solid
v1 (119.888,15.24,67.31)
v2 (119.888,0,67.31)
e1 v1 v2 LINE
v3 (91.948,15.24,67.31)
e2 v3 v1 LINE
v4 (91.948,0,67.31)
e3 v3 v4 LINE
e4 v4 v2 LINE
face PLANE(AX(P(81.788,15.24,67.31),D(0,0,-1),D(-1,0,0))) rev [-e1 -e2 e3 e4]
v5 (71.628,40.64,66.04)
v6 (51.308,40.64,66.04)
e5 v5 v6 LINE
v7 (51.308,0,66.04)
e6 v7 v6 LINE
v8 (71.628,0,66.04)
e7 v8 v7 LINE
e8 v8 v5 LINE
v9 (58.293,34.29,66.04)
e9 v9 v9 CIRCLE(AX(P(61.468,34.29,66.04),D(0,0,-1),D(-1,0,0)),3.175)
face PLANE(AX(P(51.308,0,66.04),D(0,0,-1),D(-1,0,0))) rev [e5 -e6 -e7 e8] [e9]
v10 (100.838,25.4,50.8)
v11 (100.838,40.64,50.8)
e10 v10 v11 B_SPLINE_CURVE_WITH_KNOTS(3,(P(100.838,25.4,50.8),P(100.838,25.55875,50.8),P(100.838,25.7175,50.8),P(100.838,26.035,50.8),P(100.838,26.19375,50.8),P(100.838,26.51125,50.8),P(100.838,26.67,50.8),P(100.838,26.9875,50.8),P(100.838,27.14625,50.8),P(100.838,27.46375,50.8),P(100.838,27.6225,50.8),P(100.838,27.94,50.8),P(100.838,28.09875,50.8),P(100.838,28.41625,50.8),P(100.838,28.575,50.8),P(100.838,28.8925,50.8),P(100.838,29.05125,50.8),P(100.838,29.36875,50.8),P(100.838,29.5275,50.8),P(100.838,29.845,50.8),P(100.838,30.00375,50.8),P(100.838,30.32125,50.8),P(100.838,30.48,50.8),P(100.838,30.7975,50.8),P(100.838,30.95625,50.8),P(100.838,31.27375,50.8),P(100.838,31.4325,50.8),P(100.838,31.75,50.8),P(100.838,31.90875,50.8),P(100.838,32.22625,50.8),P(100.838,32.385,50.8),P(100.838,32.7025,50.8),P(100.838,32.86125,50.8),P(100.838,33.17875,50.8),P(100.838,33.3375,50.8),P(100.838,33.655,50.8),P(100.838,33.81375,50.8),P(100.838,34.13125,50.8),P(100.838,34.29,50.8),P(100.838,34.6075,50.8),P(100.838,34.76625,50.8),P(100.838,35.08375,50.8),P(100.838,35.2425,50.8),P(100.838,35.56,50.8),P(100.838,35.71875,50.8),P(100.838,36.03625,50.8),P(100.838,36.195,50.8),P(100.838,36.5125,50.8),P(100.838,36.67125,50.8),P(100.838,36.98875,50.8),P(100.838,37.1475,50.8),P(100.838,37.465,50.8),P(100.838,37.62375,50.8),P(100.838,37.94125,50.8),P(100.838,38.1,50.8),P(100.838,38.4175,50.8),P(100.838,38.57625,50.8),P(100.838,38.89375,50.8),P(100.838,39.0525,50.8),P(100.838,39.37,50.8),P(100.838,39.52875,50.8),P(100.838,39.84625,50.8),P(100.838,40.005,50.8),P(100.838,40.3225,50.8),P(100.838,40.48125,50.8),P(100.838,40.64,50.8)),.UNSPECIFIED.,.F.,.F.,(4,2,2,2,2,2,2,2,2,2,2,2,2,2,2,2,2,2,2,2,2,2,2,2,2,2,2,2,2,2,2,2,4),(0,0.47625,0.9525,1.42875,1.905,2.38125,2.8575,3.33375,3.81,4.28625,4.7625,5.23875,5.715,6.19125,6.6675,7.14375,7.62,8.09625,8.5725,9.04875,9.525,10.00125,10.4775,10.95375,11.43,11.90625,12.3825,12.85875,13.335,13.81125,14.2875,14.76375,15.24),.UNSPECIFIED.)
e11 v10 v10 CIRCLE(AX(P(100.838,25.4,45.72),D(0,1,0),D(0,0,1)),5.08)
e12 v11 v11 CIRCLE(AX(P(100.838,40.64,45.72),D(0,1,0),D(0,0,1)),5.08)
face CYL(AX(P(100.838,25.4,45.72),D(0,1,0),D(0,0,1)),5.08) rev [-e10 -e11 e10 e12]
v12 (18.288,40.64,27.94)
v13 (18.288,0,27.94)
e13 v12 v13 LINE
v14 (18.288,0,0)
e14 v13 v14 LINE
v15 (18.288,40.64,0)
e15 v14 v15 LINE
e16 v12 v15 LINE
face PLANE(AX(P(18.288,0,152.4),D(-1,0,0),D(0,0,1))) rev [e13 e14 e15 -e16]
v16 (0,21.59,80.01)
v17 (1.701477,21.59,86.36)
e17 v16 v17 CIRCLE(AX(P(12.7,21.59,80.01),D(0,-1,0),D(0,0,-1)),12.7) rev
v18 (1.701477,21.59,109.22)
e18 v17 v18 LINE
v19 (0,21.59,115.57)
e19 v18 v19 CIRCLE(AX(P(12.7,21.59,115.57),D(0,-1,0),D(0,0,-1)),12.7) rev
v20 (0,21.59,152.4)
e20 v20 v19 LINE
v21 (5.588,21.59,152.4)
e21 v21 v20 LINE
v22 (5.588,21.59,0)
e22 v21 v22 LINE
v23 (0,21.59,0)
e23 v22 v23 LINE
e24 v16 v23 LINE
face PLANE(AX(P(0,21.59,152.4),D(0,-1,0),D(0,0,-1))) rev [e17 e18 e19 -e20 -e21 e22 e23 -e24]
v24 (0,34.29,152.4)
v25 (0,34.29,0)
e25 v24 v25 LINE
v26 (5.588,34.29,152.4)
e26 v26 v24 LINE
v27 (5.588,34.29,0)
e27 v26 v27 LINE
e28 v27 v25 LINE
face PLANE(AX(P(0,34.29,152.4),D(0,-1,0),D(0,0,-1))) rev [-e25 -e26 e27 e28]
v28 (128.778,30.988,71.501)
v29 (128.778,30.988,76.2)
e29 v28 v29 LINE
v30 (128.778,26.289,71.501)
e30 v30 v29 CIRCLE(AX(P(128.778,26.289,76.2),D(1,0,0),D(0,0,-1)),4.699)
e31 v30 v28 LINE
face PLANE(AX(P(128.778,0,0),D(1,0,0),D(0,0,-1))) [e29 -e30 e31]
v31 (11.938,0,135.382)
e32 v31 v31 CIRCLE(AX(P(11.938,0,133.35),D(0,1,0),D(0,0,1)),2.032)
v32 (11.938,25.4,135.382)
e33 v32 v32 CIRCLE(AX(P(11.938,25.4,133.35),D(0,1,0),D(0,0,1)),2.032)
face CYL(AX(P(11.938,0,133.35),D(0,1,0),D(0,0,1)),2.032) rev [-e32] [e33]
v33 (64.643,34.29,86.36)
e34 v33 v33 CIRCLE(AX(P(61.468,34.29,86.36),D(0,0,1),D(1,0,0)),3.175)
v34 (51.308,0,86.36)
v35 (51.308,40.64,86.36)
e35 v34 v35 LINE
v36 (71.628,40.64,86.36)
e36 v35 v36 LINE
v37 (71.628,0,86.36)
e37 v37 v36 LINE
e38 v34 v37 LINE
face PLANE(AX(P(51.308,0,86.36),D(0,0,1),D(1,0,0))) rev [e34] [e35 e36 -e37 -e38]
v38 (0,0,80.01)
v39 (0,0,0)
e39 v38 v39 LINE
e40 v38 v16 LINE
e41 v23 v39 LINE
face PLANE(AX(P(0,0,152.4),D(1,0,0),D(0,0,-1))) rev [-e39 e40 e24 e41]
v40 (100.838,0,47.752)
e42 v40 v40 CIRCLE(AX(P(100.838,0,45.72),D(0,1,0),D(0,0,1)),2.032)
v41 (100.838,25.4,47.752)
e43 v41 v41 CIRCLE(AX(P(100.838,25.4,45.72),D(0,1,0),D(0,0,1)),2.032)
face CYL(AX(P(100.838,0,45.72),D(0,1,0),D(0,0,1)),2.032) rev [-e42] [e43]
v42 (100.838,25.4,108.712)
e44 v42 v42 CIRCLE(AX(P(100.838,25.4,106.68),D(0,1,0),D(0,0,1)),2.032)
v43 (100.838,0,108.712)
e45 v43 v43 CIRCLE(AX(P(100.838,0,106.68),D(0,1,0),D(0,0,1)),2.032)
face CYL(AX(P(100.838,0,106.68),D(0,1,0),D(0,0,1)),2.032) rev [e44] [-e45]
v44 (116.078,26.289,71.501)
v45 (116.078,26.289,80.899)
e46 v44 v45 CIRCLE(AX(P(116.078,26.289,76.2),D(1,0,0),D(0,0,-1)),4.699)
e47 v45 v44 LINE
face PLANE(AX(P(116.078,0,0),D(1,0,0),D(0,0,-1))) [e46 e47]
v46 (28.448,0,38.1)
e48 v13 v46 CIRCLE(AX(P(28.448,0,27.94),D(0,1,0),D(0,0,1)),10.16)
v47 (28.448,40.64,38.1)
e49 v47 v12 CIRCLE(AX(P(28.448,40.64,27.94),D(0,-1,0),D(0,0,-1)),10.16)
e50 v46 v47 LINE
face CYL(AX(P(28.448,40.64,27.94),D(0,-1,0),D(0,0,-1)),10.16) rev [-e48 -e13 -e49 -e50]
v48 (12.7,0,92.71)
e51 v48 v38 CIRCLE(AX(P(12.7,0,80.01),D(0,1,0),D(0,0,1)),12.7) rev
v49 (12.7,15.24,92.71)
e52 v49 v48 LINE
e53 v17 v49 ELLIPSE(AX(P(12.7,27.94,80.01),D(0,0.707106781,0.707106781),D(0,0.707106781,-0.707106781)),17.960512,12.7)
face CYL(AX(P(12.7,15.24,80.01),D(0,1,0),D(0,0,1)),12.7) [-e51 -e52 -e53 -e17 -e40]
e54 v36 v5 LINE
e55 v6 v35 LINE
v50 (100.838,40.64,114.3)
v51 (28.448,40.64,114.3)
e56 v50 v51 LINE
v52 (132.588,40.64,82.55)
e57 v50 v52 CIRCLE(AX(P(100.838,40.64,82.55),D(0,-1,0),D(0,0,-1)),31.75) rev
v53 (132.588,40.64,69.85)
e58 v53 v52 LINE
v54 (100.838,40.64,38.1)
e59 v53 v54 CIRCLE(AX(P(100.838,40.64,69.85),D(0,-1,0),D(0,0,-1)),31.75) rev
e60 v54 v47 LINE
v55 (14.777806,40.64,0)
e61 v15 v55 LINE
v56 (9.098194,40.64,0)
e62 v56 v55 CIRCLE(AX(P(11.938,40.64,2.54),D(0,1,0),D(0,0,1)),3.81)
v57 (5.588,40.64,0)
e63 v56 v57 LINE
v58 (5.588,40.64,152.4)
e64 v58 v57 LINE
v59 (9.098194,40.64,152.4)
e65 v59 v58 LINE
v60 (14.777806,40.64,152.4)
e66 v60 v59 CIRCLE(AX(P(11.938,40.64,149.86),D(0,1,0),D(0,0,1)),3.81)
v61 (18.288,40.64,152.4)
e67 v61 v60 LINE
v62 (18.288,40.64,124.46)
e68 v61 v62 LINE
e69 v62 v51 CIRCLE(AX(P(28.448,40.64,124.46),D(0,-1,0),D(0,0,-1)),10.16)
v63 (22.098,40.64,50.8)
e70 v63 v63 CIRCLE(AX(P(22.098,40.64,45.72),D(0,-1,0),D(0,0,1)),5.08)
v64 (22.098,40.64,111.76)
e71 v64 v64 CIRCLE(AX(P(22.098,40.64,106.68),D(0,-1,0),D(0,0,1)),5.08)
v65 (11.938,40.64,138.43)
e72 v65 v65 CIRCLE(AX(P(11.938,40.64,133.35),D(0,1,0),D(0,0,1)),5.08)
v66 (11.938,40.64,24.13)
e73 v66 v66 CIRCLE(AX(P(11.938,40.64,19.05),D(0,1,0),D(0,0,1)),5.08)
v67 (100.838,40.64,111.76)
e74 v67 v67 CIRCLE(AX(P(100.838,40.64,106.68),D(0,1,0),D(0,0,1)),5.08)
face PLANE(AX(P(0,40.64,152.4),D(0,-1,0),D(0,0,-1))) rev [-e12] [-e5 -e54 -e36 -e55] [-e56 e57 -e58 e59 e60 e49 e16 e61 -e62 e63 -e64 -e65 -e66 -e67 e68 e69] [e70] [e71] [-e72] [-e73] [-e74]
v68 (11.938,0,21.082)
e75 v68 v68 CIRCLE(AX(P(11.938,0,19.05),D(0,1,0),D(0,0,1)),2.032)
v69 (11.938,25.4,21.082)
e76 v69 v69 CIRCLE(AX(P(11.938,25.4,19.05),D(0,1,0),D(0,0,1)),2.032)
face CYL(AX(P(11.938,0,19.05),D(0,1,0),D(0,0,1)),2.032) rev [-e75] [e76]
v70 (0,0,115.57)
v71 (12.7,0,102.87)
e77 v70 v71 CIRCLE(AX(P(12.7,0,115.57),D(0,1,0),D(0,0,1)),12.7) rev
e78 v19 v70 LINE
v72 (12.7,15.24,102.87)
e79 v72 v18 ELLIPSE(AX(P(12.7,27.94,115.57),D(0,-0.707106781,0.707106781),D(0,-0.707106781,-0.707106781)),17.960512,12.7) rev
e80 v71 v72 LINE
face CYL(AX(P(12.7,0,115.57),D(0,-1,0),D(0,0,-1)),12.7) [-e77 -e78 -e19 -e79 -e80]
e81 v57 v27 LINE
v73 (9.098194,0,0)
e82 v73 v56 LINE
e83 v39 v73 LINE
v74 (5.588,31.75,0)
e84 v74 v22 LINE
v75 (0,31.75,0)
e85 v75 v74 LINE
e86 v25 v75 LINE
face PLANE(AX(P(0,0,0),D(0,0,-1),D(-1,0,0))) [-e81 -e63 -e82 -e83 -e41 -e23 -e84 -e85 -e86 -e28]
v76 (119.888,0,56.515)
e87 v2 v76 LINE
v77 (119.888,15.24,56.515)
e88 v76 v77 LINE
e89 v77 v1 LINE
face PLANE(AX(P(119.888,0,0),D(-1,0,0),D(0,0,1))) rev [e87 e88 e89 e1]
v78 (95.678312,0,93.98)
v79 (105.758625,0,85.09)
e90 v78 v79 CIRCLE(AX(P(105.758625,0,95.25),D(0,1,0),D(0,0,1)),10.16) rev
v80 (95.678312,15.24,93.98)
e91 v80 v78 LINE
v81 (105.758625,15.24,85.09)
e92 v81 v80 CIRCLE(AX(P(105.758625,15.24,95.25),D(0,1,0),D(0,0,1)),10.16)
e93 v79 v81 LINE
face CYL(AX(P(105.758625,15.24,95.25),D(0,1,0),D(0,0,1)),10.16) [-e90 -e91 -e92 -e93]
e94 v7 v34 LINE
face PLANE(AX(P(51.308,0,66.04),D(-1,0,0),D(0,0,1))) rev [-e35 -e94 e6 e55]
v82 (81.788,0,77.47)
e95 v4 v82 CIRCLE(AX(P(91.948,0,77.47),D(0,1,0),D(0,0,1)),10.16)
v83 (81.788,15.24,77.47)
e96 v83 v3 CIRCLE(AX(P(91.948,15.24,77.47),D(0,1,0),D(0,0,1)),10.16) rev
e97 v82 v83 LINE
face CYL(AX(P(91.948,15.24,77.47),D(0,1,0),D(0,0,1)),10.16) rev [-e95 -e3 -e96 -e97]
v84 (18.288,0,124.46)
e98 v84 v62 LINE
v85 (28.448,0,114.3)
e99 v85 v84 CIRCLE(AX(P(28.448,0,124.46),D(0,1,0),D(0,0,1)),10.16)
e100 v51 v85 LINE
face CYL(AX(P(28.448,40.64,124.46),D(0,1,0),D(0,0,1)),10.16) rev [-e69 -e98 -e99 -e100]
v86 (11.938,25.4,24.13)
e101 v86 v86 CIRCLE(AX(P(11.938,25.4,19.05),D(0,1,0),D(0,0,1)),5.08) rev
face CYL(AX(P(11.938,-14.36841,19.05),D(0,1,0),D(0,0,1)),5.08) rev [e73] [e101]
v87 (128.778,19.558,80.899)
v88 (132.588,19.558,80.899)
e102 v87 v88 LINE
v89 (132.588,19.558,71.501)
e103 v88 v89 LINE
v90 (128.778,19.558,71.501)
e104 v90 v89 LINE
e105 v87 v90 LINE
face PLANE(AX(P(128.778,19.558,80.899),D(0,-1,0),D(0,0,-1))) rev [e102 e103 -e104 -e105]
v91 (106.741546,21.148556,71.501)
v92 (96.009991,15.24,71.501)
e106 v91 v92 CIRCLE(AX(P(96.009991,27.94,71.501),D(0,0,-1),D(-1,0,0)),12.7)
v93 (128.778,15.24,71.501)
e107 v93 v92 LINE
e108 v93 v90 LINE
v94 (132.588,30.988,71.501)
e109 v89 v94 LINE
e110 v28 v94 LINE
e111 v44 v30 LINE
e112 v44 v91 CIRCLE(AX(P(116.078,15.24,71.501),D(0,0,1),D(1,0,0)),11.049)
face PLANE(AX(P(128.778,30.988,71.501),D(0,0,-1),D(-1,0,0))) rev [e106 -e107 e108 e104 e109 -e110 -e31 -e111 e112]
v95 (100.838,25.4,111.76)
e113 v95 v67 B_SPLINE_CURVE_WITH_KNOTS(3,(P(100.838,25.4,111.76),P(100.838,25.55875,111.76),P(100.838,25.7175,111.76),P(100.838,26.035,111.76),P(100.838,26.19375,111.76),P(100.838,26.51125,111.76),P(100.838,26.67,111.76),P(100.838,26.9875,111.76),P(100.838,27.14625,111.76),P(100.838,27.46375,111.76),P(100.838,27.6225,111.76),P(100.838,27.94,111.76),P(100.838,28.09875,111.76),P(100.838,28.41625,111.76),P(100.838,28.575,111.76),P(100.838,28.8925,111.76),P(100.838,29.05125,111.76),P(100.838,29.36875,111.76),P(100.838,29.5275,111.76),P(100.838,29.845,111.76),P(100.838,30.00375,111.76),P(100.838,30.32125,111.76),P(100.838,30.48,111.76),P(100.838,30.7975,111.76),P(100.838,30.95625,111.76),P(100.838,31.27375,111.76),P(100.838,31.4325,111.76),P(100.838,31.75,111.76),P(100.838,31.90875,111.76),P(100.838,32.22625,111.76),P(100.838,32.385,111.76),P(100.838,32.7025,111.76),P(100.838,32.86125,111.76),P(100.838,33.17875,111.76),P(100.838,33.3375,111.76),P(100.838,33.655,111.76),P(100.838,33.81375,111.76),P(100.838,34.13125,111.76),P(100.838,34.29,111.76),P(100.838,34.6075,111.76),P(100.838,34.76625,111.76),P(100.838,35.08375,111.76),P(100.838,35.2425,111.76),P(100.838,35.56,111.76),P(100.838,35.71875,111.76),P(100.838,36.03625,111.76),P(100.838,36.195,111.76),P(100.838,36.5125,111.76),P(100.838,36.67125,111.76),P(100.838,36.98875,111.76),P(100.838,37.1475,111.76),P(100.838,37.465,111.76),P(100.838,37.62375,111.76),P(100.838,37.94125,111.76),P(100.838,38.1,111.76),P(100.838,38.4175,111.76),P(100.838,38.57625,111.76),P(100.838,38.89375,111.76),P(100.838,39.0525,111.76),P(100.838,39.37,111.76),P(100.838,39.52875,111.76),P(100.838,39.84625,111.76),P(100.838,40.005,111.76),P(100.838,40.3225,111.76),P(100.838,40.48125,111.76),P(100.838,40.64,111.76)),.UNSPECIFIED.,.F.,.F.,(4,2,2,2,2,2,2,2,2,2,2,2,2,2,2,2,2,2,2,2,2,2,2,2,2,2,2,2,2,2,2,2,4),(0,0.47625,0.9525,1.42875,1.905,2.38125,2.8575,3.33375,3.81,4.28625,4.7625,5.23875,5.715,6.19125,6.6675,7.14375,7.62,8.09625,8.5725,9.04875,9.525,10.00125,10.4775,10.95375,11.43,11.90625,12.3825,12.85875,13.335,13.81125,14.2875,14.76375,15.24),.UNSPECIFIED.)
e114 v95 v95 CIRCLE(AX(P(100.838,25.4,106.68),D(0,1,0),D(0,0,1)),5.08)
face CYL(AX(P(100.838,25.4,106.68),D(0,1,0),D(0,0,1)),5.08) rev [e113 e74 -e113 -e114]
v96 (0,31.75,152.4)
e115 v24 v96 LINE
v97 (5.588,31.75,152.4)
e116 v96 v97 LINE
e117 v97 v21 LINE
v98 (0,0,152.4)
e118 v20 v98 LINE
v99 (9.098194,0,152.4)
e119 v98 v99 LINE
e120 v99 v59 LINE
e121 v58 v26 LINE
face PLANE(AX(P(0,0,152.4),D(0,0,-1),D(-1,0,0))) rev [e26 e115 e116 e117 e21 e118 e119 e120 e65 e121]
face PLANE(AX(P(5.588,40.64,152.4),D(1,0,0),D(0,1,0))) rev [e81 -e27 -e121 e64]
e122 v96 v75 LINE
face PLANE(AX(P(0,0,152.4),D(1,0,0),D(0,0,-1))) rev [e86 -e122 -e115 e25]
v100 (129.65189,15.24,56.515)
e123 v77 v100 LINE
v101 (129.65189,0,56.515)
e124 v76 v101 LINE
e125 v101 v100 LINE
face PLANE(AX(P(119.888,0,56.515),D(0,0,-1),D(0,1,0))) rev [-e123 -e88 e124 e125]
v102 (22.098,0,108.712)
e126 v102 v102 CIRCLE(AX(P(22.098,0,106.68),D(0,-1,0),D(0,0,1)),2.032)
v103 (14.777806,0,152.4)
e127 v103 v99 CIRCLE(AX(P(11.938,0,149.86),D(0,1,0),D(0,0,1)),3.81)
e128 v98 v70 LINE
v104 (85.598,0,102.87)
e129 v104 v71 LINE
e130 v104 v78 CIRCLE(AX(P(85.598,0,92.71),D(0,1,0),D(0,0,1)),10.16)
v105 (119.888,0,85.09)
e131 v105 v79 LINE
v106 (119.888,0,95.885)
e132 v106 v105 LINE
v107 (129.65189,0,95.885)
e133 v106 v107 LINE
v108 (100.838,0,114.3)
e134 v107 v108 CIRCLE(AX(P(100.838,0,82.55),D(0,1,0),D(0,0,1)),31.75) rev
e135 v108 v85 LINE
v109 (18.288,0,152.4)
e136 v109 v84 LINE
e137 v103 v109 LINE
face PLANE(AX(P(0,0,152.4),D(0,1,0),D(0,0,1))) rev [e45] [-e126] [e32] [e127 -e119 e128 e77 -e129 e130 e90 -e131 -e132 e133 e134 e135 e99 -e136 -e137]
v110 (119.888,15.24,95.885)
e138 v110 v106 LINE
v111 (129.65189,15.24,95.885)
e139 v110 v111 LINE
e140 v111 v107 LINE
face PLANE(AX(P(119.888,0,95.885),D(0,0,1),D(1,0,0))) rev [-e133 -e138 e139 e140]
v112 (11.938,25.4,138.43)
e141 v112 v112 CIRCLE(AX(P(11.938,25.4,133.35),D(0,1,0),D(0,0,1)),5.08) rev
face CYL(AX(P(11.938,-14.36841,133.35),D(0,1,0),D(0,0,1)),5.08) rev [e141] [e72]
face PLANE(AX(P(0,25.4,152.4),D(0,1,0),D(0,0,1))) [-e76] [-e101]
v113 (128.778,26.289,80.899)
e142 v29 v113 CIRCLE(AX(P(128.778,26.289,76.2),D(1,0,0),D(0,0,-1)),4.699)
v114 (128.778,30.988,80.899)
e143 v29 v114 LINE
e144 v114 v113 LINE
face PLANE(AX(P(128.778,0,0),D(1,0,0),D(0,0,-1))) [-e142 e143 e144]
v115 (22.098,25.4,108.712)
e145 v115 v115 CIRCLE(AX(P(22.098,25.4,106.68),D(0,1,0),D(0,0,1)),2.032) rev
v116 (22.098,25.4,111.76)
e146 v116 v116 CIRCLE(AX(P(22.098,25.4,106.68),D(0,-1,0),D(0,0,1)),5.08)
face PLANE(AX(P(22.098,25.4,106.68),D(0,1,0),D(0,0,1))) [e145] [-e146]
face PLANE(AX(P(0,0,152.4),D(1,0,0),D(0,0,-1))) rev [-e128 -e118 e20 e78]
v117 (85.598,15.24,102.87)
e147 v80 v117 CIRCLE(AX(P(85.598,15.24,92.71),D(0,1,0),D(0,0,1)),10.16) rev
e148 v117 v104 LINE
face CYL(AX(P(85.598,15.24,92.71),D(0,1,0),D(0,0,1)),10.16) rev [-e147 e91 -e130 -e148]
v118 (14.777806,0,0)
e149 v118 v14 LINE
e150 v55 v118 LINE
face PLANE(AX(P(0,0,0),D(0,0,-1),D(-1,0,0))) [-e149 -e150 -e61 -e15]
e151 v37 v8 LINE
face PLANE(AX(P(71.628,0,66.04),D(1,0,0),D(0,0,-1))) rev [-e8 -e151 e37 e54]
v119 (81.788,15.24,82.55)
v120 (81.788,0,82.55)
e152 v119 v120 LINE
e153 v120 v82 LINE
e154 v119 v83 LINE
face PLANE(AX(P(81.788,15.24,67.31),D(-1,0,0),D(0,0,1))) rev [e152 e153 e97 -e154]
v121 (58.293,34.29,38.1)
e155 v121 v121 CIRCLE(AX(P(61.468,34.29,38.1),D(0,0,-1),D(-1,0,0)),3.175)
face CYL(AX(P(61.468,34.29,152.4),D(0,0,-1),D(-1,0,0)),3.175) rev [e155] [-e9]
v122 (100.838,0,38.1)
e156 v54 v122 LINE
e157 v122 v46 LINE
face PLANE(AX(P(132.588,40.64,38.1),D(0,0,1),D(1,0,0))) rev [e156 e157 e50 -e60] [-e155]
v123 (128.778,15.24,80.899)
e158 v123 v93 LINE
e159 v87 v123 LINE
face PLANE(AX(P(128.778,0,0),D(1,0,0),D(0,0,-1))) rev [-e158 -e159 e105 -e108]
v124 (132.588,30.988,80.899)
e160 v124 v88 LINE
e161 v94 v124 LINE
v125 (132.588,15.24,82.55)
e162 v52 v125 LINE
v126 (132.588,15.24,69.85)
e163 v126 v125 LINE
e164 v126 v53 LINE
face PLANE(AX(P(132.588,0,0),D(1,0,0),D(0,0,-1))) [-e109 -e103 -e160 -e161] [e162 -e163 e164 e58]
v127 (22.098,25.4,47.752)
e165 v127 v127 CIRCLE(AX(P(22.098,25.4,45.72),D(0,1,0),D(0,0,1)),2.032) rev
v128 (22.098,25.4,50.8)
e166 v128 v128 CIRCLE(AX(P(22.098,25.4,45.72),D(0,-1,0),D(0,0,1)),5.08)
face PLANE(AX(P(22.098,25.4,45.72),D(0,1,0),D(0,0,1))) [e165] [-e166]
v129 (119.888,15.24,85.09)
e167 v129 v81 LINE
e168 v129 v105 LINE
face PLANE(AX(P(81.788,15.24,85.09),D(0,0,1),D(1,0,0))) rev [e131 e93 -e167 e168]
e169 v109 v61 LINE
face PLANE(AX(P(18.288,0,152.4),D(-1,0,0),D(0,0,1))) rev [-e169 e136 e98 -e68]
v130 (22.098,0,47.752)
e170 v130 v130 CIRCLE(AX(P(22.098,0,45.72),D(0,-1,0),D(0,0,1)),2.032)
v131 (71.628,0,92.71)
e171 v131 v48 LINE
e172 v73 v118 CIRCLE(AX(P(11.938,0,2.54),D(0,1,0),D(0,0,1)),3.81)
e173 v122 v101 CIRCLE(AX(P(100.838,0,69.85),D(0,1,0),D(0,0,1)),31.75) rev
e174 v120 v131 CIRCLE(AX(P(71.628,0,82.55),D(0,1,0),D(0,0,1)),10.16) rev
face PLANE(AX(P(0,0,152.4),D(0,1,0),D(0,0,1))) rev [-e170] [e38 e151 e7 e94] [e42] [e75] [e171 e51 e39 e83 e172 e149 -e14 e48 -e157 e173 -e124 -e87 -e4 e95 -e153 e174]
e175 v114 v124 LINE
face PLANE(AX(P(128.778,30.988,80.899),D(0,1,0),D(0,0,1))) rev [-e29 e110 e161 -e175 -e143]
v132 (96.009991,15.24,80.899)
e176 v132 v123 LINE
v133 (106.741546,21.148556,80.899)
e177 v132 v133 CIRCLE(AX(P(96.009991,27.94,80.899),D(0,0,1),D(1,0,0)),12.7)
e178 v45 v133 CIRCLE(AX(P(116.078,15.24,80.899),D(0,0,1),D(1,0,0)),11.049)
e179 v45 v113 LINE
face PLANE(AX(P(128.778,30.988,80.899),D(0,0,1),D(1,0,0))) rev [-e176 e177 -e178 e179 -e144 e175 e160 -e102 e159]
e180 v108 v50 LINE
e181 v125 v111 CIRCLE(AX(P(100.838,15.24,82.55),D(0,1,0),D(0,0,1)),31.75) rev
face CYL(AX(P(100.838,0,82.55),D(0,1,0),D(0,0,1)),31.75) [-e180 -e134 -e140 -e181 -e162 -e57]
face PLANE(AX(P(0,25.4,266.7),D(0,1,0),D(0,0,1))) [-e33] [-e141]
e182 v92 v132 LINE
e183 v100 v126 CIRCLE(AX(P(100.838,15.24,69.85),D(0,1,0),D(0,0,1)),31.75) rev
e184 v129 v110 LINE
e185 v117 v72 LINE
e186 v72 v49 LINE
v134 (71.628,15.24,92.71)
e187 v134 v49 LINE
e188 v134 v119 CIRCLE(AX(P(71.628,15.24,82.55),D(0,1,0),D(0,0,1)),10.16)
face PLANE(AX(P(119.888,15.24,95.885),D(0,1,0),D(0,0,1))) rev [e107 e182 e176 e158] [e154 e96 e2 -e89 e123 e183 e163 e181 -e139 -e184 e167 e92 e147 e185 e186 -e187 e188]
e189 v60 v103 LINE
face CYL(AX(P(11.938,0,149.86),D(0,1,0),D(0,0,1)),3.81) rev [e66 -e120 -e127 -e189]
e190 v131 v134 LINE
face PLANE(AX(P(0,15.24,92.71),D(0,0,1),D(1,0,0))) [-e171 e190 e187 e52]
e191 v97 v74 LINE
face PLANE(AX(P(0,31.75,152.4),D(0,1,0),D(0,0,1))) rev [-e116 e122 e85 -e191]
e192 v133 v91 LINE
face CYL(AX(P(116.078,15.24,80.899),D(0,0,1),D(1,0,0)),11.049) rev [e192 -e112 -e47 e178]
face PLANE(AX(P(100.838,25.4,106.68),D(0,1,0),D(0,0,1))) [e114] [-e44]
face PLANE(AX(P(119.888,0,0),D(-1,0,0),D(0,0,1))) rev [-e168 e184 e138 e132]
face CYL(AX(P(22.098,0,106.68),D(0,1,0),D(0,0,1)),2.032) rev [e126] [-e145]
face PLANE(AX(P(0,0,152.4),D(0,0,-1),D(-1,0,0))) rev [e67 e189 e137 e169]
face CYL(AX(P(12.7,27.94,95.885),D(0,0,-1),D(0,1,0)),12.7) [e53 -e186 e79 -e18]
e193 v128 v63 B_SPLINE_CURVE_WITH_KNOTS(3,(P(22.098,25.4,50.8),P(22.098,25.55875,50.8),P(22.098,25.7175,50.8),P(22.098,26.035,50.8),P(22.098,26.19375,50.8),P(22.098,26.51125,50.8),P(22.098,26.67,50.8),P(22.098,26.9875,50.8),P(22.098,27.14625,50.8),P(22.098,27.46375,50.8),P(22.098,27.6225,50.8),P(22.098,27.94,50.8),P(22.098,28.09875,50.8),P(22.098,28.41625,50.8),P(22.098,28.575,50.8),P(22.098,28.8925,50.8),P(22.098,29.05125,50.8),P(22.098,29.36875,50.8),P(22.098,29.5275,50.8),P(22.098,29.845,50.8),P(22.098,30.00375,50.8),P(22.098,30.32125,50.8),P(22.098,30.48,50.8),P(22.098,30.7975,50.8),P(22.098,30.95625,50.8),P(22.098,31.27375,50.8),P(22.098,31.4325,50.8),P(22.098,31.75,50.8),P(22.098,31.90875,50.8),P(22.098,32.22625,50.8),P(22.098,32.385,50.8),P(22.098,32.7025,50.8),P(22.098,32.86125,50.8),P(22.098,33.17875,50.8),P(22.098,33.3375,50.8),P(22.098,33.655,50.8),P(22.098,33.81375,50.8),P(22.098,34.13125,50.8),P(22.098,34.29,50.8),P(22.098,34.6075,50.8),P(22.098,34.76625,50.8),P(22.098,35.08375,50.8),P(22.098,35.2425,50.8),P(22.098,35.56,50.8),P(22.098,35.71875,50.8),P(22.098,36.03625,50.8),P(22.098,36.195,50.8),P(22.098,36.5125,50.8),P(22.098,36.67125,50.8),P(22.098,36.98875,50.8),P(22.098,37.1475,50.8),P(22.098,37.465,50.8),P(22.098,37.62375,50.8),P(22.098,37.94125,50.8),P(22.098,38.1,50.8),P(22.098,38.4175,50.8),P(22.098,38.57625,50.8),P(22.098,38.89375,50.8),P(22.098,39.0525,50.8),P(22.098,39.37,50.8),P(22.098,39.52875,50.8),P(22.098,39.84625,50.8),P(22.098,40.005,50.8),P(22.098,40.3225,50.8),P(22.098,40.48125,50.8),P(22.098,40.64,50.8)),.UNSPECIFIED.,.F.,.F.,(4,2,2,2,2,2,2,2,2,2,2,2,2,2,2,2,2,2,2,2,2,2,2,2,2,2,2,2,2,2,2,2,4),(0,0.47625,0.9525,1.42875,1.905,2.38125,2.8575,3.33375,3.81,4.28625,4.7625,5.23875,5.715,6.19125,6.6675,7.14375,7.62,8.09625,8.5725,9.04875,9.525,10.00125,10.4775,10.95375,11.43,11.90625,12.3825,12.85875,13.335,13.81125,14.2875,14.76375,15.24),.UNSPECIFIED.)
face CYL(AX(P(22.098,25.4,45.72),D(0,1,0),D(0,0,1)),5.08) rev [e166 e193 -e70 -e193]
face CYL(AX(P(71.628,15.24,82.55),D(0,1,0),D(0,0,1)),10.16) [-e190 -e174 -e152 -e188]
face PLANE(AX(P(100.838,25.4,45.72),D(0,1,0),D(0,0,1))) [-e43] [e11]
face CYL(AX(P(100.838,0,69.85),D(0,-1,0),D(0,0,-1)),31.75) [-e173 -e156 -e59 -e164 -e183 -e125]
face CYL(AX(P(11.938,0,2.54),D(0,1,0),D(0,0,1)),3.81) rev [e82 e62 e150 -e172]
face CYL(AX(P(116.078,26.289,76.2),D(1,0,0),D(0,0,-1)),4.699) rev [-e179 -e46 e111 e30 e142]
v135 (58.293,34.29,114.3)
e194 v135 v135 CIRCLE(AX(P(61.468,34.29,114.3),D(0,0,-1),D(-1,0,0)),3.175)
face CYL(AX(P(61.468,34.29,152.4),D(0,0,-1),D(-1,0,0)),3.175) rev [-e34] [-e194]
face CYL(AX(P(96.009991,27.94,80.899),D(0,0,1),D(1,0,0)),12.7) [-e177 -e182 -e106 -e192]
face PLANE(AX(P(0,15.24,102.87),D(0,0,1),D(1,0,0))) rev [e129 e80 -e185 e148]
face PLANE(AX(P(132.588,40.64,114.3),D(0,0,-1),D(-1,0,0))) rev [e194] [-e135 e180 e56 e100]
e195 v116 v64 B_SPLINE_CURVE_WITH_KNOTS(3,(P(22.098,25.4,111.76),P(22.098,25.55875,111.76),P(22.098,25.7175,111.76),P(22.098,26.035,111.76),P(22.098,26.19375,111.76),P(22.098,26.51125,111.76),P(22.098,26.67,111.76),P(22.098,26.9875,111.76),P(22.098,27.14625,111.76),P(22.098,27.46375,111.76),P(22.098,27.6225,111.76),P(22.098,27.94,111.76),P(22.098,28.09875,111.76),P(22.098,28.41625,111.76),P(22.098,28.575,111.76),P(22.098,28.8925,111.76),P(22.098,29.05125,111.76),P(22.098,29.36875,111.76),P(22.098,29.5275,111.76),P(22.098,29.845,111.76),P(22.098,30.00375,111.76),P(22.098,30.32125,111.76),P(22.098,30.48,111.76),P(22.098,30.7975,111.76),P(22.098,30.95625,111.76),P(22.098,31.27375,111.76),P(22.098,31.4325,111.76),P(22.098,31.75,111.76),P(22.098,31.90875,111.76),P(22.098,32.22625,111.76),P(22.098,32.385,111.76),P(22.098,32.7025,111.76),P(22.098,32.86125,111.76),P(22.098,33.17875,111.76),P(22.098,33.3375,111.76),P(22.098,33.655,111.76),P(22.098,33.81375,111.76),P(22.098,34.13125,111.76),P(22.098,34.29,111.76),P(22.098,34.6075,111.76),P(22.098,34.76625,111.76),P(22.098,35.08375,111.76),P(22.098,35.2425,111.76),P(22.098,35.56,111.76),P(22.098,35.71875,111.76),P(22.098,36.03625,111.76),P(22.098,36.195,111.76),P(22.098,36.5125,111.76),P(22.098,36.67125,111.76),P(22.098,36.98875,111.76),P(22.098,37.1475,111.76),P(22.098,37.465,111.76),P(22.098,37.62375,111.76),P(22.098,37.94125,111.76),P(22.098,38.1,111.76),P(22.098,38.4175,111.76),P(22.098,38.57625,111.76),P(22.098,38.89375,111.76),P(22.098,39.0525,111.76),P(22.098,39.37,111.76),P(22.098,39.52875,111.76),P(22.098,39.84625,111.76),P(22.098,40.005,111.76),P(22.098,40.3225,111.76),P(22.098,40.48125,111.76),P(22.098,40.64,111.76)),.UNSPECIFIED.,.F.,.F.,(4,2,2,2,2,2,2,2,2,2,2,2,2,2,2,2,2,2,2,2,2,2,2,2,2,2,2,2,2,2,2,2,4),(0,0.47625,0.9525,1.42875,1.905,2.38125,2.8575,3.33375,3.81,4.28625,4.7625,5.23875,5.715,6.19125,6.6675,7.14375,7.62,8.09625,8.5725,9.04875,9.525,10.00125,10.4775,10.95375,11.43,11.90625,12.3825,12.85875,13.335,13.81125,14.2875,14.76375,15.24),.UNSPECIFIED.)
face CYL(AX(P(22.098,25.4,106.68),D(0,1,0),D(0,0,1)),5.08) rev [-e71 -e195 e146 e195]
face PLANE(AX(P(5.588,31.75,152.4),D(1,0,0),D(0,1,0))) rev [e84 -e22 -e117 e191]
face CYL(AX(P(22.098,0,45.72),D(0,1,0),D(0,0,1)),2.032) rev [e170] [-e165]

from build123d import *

# Parameters (mm, degrees)
SKETCH1_W           = 18.288
SKETCH1_H           = 40.64
BOSS_EXTRUDE1_DEPTH = 152.4
SKETCH2_W           = 5.588
SKETCH2_H           = 6.35
SKETCH2_H_2         = 10.16
CUT_EXTRUDE1_DEPTH  = 152.4
SKETCH3_R           = 5.08
CUT_EXTRUDE2_DEPTH  = 15.24
LPATTERN1_COUNT     = 4
LPATTERN1_PITCH     = 38.1
SKETCH4_R           = 2.032
CUT_EXTRUDE3_DEPTH  = 159.782305513
LPATTERN2_COUNT     = 4
LPATTERN2_PITCH     = 38.1
SKETCH5_W           = 76.2
SKETCH5_H           = 40.64
BOSS_EXTRUDE2_DEPTH = 114.3
SKETCH6_W           = 101.6
SKETCH6_H           = 76.2
BOSS_EXTRUDE3_DEPTH = 22.86
SKETCH8_R           = 3.81
CUT_EXTRUDE5_DEPTH  = 207.050836795
FILLET3_R           = 10.16
FILLET4_R           = 31.75
SKETCH16_W          = 76.2
SKETCH16_H          = 22.86
CUT_EXTRUDE13_DEPTH = 194.857086535
SKETCH18_W          = 20.32
SKETCH18_H          = 20.32
CUT_EXTRUDE14_DEPTH = 207.050836795
SKETCH19_W          = 39.37
SKETCH19_H          = 15.24
CUT_EXTRUDE15_DEPTH = 12.7
SKETCH20_W          = 38.1
SKETCH20_H          = 17.78
CUT_EXTRUDE16_DEPTH = 15.24
SKETCH21_W          = 13.97
SKETCH21_H          = 7.62
CUT_EXTRUDE17_DEPTH = 15.24
FILLET5_R           = 10.16
SKETCH22_W          = 9.398
SKETCH22_H          = 11.43
CUT_EXTRUDE18_DEPTH = 3.81
CUT_EXTRUDE19_DEPTH = 12.7
SKETCH25_W          = 9.398
SKETCH25_H          = 11.049
FILLET6_R           = 12.7
FILLET7_R           = 12.7
SKETCH26_R          = 5.08
CUT_EXTRUDE20_DEPTH = 15.24
SKETCH27_R          = 2.032
CUT_EXTRUDE21_DEPTH = 207.050836795
FILLET8_R           = 10.16
SKETCH29_R          = 3.175
CUT_EXTRUDE22_DEPTH = 180.70998134


with BuildPart() as part:
    # Sketch1 → Boss-Extrude1 (new body)
    with BuildSketch(Plane.XY):
        with Locations((9.144, 20.32)):
            Rectangle(SKETCH1_W, SKETCH1_H)
    extrude(amount=BOSS_EXTRUDE1_DEPTH)

    # Sketch2 → Cut-Extrude1 (cut)
    with BuildSketch(Plane(origin=(0, 0, 0), x_dir=(-1, 0, 0), z_dir=(0, 0, -1))):
        with Locations((-2.794, 37.465)):
            Rectangle(SKETCH2_W, SKETCH2_H)
        with Locations((-2.794, 26.67)):
            Rectangle(SKETCH2_W, SKETCH2_H_2)
    extrude(amount=-CUT_EXTRUDE1_DEPTH, mode=Mode.SUBTRACT)

    # Sketch3 → Cut-Extrude2 (cut)
    with BuildSketch(Plane(origin=(0, 40.64, 0), x_dir=(1, 0, 0), z_dir=(0, 1, 0))):
        with Locations(Location((11.938, -19.05, 0), (0, 0, 270))):
            Circle(SKETCH3_R)
    cut_extrude2 = extrude(amount=-CUT_EXTRUDE2_DEPTH, mode=Mode.SUBTRACT)

    # LPattern1: Cut-Extrude2 ×4, 2 skipped
    with Locations(*[(0, 0, i * LPATTERN1_PITCH) for i in range(1, LPATTERN1_COUNT) if i not in (1, 2)]):
        add(cut_extrude2, mode=Mode.SUBTRACT)

    # Sketch4 → Cut-Extrude3 (cut, through all)
    with BuildSketch(Plane(origin=(0, 40.64, 0), x_dir=(1, 0, 0), z_dir=(0, 1, 0))):
        with Locations(Location((11.938, -19.05, 0), (0, 0, 270))):
            Circle(SKETCH4_R)
    cut_extrude3 = extrude(amount=-CUT_EXTRUDE3_DEPTH, mode=Mode.SUBTRACT)

    # LPattern2: Cut-Extrude3 ×4, 2 skipped
    with Locations(*[(0, 0, i * LPATTERN2_PITCH) for i in range(1, LPATTERN2_COUNT) if i not in (1, 2)]):
        add(cut_extrude3, mode=Mode.SUBTRACT)

    # Sketch5 → Boss-Extrude2 (add)
    with BuildSketch(Plane(origin=(18.288, 0, 0), x_dir=(0, 0, -1), z_dir=(1, 0, 0))):
        with Locations((-76.2, 20.32)):
            Rectangle(SKETCH5_W, SKETCH5_H)
    extrude(amount=BOSS_EXTRUDE2_DEPTH)

    # Sketch6 → Boss-Extrude3 (add)
    with BuildSketch(Plane(origin=(0, 40.64, 0), x_dir=(1, 0, 0), z_dir=(0, 1, 0))):
        with Locations((81.788, -76.2)):
            Rectangle(SKETCH6_W, SKETCH6_H)
    extrude(amount=BOSS_EXTRUDE3_DEPTH)

    # Sketch8 → Cut-Extrude5 (cut, through all)
    with BuildSketch(Plane(origin=(0, 40.64, 0), x_dir=(1, 0, 0), z_dir=(0, 1, 0))):
        with Locations((11.938, -149.86)):
            Circle(SKETCH8_R)
        with Locations((11.938, -2.54)):
            Circle(SKETCH8_R)
    extrude(amount=-CUT_EXTRUDE5_DEPTH, mode=Mode.SUBTRACT)

    # Fillet3
    fillet3_edges = [part.edges().sort_by_distance(p)[0] for p in [
        (18.288, 20.32, 114.3),
        (18.288, 20.32, 38.1),
    ]]
    fillet(fillet3_edges, radius=FILLET3_R)

    # Fillet4
    fillet4_edges = [part.edges().sort_by_distance(p)[0] for p in [
        (132.588, 31.75, 114.3),
        (132.588, 31.75, 38.1),
    ]]
    fillet(fillet4_edges, radius=FILLET4_R)

    # Sketch16 → Cut-Extrude13 (cut, through all)
    with BuildSketch(Plane.ZY.offset(-30.988)):
        with Locations((76.2, 52.07)):
            Rectangle(SKETCH16_W, SKETCH16_H)
    extrude(amount=-CUT_EXTRUDE13_DEPTH, mode=Mode.SUBTRACT)

    # Sketch18 → Cut-Extrude14 (cut, through all)
    with BuildSketch(Plane(origin=(0, 40.64, 0), x_dir=(1, 0, 0), z_dir=(0, 1, 0))):
        with Locations((61.468, -76.2)):
            Rectangle(SKETCH18_W, SKETCH18_H)
    extrude(amount=-CUT_EXTRUDE14_DEPTH, mode=Mode.SUBTRACT)

    # Sketch19 → Cut-Extrude15 (cut)
    with BuildSketch(Plane(origin=(132.588, 0, 0), x_dir=(0, 0, -1), z_dir=(1, 0, 0))):
        with Locations((-76.2, 7.62)):
            Rectangle(SKETCH19_W, SKETCH19_H)
    extrude(amount=-CUT_EXTRUDE15_DEPTH, mode=Mode.SUBTRACT)

    # Sketch20 → Cut-Extrude16 (cut)
    with BuildSketch(Plane.XZ):
        with Locations((100.838, 76.2)):
            Rectangle(SKETCH20_W, SKETCH20_H)
    extrude(amount=-CUT_EXTRUDE16_DEPTH, mode=Mode.SUBTRACT)

    # Sketch21 → Cut-Extrude17 (cut)
    with BuildSketch(Plane.XZ):
        Polygon((0, 92.71), (81.788, 92.71), (95.758, 92.71), (95.758, 102.87), (0, 102.87), align=None)
        with Locations((88.773, 88.9)):
            Rectangle(SKETCH21_W, SKETCH21_H)
    extrude(amount=-CUT_EXTRUDE17_DEPTH, mode=Mode.SUBTRACT)

    # Fillet5
    fillet5_edges = [part.edges().sort_by_distance(p)[0] for p in [
        (81.788, 7.62, 67.31),
        (95.758, 7.62, 102.87),
        (81.788, 7.62, 92.71),
    ]]
    fillet(fillet5_edges, radius=FILLET5_R)

    # Sketch22 → Cut-Extrude18 (cut)
    with BuildSketch(Plane(origin=(132.588, 0, 0), x_dir=(0, 0, -1), z_dir=(1, 0, 0))):
        with Locations((-76.2, 25.273)):
            Rectangle(SKETCH22_W, SKETCH22_H)
    extrude(amount=-CUT_EXTRUDE18_DEPTH, mode=Mode.SUBTRACT)

    # Sketch23 → Cut-Extrude19 (cut)
    with BuildSketch(Plane(origin=(128.778, 0, 0), x_dir=(0, 0, -1), z_dir=(1, 0, 0))):
        with BuildLine():
            Line((-71.501, 19.558), (-71.501, 26.289))
            ThreePointArc((-71.501, 26.289), (-72.877305235, 22.966305235), (-76.2, 21.59))
            Line((-76.2, 21.59), (-76.2, 19.558))
            Line((-76.2, 19.558), (-71.501, 19.558))
        make_face()
        with BuildLine():
            ThreePointArc((-71.501, 26.289), (-72.877305235, 29.611694765), (-76.2, 30.988))
            Line((-76.2, 30.988), (-76.2, 26.289))
            Line((-76.2, 26.289), (-71.501, 26.289))
        make_face()
        with BuildLine():
            Line((-76.2, 26.289), (-76.2, 30.988))
            ThreePointArc((-76.2, 30.988), (-79.522694765, 29.611694765), (-80.899, 26.289))
            Line((-80.899, 26.289), (-76.2, 26.289))
        make_face()
        with BuildLine():
            Line((-71.501, 26.289), (-76.2, 26.289))
            Line((-76.2, 26.289), (-76.2, 21.59))
            ThreePointArc((-76.2, 21.59), (-72.877305235, 22.966305235), (-71.501, 26.289))
        make_face()
        with BuildLine():
            Line((-76.2, 21.59), (-76.2, 26.289))
            Line((-76.2, 26.289), (-80.899, 26.289))
            ThreePointArc((-80.899, 26.289), (-79.522694765, 22.966305235), (-76.2, 21.59))
        make_face()
        with BuildLine():
            ThreePointArc((-76.2, 21.59), (-79.522694765, 22.966305235), (-80.899, 26.289))
            Line((-80.899, 26.289), (-80.899, 19.558))
            Line((-80.899, 19.558), (-76.2, 19.558))
            Line((-76.2, 19.558), (-76.2, 21.59))
        make_face()
        Polygon((-71.501, 9.779), (-71.501, 19.558), (-76.2, 19.558), (-80.899, 19.558), (-80.899, 9.779), align=None)
    extrude(amount=-CUT_EXTRUDE19_DEPTH, mode=Mode.SUBTRACT)

    # Sketch25 → Cut-Revolve1 (revolve, cut)
    with BuildSketch(Plane(origin=(116.078, 0, 0), x_dir=(0, 0, -1), z_dir=(1, 0, 0))):
        with Locations((-76.2, 20.7645)):
            Rectangle(SKETCH25_W, SKETCH25_H)
    revolve(axis=Axis((116.078, 15.24, 80.899), (0, 0, -1)), mode=Mode.SUBTRACT)

    # Fillet6
    fillet6_edges = [part.edges().sort_by_distance(p)[0] for p in [
        (105.029, 15.24, 76.2),
    ]]
    fillet(fillet6_edges, radius=FILLET6_R)

    # Fillet7
    # the kernel refuses this fillet: 12.7 mm, written as the material it takes off along each edge
    with BuildSketch(Plane(origin=(0, 15.24, 102.87), x_dir=(1, 0, 0), z_dir=(0, 0, -1))) as fillet7_piece_1:
        with BuildLine():
            CenterArc((FILLET7_R, -FILLET7_R), FILLET7_R, 90, 90)
            Line((0, -FILLET7_R), (0, 0))
            Line((0, 0), (FILLET7_R, 0))
        make_face()
    extrude(amount=10.16, mode=Mode.SUBTRACT)
    with BuildSketch(Plane(origin=(0, -31.75, 92.71), x_dir=(0, 0, -1), z_dir=(0, 1, 0))) as fillet7_piece_2:
        with BuildLine():
            CenterArc((FILLET7_R, -FILLET7_R), FILLET7_R, 90, 90)
            Line((0, -FILLET7_R), (0, 0))
            Line((0, 0), (FILLET7_R, 0))
        make_face()
    extrude(amount=46.99, mode=Mode.SUBTRACT)
    with BuildSketch(Plane(origin=(0, -31.75, 102.87), x_dir=(0, 0, 1), z_dir=(0, 1, 0))) as fillet7_piece_3:
        with BuildLine():
            CenterArc((FILLET7_R, FILLET7_R), FILLET7_R, 180, 90)
            Line((0, FILLET7_R), (0, 0))
            Line((0, 0), (FILLET7_R, 0))
        make_face()
    extrude(amount=46.99, mode=Mode.SUBTRACT)
    with BuildSketch(Plane(origin=(0, 15.24, 134.62), x_dir=(1, 0, 0), z_dir=(0, 0, -1))) as fillet7_piece_4a_section:
        with BuildLine():
            CenterArc((FILLET7_R, -FILLET7_R), FILLET7_R, 90, 90)
            Line((0, -FILLET7_R), (0, 0))
            Line((0, 0), (FILLET7_R, 0))
        make_face()
    fillet7_piece_4a = extrude(amount=41.91, mode=Mode.PRIVATE)
    fillet7_piece_4a = split(fillet7_piece_4a, bisect_by=Plane(origin=(2.875217951, 18.115217951, 102.87), z_dir=(0, 0, 1)), keep=Keep.TOP, mode=Mode.PRIVATE)
    with BuildSketch(Plane(origin=(0, -31.75, 102.87), x_dir=(0, 0, 1), z_dir=(0, 1, 0))) as fillet7_piece_4b_section:
        with BuildLine():
            CenterArc((FILLET7_R, FILLET7_R), FILLET7_R, 180, 90)
            Line((0, FILLET7_R), (0, 0))
            Line((0, 0), (FILLET7_R, 0))
        make_face()
    fillet7_piece_4b = extrude(amount=78.74, mode=Mode.PRIVATE)
    fillet7_piece_4b = split(fillet7_piece_4b, bisect_by=Plane(origin=(2.875217951, 15.24, 105.745217951), z_dir=(0, 1, 0)), keep=Keep.TOP, mode=Mode.PRIVATE)
    fillet7_piece_4 = fillet7_piece_4a & fillet7_piece_4b
    add(fillet7_piece_4, mode=Mode.SUBTRACT)
    with BuildSketch(Plane(origin=(0, 15.24, 102.87), x_dir=(1, 0, 0), z_dir=(0, 0, -1))) as fillet7_piece_5a_section:
        with BuildLine():
            CenterArc((FILLET7_R, -FILLET7_R), FILLET7_R, 90, 90)
            Line((0, -FILLET7_R), (0, 0))
            Line((0, 0), (FILLET7_R, 0))
        make_face()
    fillet7_piece_5a = extrude(amount=41.91, mode=Mode.PRIVATE)
    fillet7_piece_5a = split(fillet7_piece_5a, bisect_by=Plane(origin=(2.875217951, 18.115217951, 92.71), z_dir=(0, 0, -1)), keep=Keep.TOP, mode=Mode.PRIVATE)
    with BuildSketch(Plane(origin=(0, -31.75, 92.71), x_dir=(0, 0, -1), z_dir=(0, 1, 0))) as fillet7_piece_5b_section:
        with BuildLine():
            CenterArc((FILLET7_R, -FILLET7_R), FILLET7_R, 90, 90)
            Line((0, -FILLET7_R), (0, 0))
            Line((0, 0), (FILLET7_R, 0))
        make_face()
    fillet7_piece_5b = extrude(amount=78.74, mode=Mode.PRIVATE)
    fillet7_piece_5b = split(fillet7_piece_5b, bisect_by=Plane(origin=(2.875217951, 15.24, 89.834782049), z_dir=(0, 1, 0)), keep=Keep.TOP, mode=Mode.PRIVATE)
    fillet7_piece_5 = fillet7_piece_5a & fillet7_piece_5b
    add(fillet7_piece_5, mode=Mode.SUBTRACT)

    # Sketch26 → Cut-Extrude20 (cut)
    with BuildSketch(Plane(origin=(0, 40.64, 0), x_dir=(1, 0, 0), z_dir=(0, 1, 0))):
        with Locations(Location((100.838, -106.68, 0), (0, 0, 270))):
            Circle(SKETCH26_R)
        with Locations(Location((100.838, -45.72, 0), (0, 0, 270))):
            Circle(SKETCH26_R)
    cut_extrude20 = extrude(amount=-CUT_EXTRUDE20_DEPTH, mode=Mode.SUBTRACT)

    # Sketch27 → Cut-Extrude21 (cut, through all)
    with BuildSketch(Plane(origin=(0, 40.64, 0), x_dir=(1, 0, 0), z_dir=(0, 1, 0))):
        with Locations(Location((100.838, -106.68, 0), (0, 0, 270))):
            Circle(SKETCH27_R)
        with Locations(Location((100.838, -45.72, 0), (0, 0, 270))):
            Circle(SKETCH27_R)
    cut_extrude21 = extrude(amount=-CUT_EXTRUDE21_DEPTH, mode=Mode.SUBTRACT)

    # Mirror1: Cut-Extrude20, Cut-Extrude21 across plane
    add(cut_extrude20.mirror(Plane.ZY.offset(-61.468)), mode=Mode.SUBTRACT)
    add(cut_extrude21.mirror(Plane.ZY.offset(-61.468)), mode=Mode.SUBTRACT)

    # Fillet8
    fillet8_edges = [part.edges().sort_by_distance(p)[0] for p in [
        (95.758, 7.62, 85.09),
    ]]
    fillet(fillet8_edges, radius=FILLET8_R)

    # Sketch29 → Cut-Extrude22 (cut, through all)
    with BuildSketch(Plane(origin=(0, 0, 38.1), x_dir=(-1, 0, 0), z_dir=(0, 0, -1))):
        with Locations((-61.468, 34.29)):
            Circle(SKETCH29_R)
    extrude(amount=-CUT_EXTRUDE22_DEPTH, mode=Mode.SUBTRACT)


solid = part.part
